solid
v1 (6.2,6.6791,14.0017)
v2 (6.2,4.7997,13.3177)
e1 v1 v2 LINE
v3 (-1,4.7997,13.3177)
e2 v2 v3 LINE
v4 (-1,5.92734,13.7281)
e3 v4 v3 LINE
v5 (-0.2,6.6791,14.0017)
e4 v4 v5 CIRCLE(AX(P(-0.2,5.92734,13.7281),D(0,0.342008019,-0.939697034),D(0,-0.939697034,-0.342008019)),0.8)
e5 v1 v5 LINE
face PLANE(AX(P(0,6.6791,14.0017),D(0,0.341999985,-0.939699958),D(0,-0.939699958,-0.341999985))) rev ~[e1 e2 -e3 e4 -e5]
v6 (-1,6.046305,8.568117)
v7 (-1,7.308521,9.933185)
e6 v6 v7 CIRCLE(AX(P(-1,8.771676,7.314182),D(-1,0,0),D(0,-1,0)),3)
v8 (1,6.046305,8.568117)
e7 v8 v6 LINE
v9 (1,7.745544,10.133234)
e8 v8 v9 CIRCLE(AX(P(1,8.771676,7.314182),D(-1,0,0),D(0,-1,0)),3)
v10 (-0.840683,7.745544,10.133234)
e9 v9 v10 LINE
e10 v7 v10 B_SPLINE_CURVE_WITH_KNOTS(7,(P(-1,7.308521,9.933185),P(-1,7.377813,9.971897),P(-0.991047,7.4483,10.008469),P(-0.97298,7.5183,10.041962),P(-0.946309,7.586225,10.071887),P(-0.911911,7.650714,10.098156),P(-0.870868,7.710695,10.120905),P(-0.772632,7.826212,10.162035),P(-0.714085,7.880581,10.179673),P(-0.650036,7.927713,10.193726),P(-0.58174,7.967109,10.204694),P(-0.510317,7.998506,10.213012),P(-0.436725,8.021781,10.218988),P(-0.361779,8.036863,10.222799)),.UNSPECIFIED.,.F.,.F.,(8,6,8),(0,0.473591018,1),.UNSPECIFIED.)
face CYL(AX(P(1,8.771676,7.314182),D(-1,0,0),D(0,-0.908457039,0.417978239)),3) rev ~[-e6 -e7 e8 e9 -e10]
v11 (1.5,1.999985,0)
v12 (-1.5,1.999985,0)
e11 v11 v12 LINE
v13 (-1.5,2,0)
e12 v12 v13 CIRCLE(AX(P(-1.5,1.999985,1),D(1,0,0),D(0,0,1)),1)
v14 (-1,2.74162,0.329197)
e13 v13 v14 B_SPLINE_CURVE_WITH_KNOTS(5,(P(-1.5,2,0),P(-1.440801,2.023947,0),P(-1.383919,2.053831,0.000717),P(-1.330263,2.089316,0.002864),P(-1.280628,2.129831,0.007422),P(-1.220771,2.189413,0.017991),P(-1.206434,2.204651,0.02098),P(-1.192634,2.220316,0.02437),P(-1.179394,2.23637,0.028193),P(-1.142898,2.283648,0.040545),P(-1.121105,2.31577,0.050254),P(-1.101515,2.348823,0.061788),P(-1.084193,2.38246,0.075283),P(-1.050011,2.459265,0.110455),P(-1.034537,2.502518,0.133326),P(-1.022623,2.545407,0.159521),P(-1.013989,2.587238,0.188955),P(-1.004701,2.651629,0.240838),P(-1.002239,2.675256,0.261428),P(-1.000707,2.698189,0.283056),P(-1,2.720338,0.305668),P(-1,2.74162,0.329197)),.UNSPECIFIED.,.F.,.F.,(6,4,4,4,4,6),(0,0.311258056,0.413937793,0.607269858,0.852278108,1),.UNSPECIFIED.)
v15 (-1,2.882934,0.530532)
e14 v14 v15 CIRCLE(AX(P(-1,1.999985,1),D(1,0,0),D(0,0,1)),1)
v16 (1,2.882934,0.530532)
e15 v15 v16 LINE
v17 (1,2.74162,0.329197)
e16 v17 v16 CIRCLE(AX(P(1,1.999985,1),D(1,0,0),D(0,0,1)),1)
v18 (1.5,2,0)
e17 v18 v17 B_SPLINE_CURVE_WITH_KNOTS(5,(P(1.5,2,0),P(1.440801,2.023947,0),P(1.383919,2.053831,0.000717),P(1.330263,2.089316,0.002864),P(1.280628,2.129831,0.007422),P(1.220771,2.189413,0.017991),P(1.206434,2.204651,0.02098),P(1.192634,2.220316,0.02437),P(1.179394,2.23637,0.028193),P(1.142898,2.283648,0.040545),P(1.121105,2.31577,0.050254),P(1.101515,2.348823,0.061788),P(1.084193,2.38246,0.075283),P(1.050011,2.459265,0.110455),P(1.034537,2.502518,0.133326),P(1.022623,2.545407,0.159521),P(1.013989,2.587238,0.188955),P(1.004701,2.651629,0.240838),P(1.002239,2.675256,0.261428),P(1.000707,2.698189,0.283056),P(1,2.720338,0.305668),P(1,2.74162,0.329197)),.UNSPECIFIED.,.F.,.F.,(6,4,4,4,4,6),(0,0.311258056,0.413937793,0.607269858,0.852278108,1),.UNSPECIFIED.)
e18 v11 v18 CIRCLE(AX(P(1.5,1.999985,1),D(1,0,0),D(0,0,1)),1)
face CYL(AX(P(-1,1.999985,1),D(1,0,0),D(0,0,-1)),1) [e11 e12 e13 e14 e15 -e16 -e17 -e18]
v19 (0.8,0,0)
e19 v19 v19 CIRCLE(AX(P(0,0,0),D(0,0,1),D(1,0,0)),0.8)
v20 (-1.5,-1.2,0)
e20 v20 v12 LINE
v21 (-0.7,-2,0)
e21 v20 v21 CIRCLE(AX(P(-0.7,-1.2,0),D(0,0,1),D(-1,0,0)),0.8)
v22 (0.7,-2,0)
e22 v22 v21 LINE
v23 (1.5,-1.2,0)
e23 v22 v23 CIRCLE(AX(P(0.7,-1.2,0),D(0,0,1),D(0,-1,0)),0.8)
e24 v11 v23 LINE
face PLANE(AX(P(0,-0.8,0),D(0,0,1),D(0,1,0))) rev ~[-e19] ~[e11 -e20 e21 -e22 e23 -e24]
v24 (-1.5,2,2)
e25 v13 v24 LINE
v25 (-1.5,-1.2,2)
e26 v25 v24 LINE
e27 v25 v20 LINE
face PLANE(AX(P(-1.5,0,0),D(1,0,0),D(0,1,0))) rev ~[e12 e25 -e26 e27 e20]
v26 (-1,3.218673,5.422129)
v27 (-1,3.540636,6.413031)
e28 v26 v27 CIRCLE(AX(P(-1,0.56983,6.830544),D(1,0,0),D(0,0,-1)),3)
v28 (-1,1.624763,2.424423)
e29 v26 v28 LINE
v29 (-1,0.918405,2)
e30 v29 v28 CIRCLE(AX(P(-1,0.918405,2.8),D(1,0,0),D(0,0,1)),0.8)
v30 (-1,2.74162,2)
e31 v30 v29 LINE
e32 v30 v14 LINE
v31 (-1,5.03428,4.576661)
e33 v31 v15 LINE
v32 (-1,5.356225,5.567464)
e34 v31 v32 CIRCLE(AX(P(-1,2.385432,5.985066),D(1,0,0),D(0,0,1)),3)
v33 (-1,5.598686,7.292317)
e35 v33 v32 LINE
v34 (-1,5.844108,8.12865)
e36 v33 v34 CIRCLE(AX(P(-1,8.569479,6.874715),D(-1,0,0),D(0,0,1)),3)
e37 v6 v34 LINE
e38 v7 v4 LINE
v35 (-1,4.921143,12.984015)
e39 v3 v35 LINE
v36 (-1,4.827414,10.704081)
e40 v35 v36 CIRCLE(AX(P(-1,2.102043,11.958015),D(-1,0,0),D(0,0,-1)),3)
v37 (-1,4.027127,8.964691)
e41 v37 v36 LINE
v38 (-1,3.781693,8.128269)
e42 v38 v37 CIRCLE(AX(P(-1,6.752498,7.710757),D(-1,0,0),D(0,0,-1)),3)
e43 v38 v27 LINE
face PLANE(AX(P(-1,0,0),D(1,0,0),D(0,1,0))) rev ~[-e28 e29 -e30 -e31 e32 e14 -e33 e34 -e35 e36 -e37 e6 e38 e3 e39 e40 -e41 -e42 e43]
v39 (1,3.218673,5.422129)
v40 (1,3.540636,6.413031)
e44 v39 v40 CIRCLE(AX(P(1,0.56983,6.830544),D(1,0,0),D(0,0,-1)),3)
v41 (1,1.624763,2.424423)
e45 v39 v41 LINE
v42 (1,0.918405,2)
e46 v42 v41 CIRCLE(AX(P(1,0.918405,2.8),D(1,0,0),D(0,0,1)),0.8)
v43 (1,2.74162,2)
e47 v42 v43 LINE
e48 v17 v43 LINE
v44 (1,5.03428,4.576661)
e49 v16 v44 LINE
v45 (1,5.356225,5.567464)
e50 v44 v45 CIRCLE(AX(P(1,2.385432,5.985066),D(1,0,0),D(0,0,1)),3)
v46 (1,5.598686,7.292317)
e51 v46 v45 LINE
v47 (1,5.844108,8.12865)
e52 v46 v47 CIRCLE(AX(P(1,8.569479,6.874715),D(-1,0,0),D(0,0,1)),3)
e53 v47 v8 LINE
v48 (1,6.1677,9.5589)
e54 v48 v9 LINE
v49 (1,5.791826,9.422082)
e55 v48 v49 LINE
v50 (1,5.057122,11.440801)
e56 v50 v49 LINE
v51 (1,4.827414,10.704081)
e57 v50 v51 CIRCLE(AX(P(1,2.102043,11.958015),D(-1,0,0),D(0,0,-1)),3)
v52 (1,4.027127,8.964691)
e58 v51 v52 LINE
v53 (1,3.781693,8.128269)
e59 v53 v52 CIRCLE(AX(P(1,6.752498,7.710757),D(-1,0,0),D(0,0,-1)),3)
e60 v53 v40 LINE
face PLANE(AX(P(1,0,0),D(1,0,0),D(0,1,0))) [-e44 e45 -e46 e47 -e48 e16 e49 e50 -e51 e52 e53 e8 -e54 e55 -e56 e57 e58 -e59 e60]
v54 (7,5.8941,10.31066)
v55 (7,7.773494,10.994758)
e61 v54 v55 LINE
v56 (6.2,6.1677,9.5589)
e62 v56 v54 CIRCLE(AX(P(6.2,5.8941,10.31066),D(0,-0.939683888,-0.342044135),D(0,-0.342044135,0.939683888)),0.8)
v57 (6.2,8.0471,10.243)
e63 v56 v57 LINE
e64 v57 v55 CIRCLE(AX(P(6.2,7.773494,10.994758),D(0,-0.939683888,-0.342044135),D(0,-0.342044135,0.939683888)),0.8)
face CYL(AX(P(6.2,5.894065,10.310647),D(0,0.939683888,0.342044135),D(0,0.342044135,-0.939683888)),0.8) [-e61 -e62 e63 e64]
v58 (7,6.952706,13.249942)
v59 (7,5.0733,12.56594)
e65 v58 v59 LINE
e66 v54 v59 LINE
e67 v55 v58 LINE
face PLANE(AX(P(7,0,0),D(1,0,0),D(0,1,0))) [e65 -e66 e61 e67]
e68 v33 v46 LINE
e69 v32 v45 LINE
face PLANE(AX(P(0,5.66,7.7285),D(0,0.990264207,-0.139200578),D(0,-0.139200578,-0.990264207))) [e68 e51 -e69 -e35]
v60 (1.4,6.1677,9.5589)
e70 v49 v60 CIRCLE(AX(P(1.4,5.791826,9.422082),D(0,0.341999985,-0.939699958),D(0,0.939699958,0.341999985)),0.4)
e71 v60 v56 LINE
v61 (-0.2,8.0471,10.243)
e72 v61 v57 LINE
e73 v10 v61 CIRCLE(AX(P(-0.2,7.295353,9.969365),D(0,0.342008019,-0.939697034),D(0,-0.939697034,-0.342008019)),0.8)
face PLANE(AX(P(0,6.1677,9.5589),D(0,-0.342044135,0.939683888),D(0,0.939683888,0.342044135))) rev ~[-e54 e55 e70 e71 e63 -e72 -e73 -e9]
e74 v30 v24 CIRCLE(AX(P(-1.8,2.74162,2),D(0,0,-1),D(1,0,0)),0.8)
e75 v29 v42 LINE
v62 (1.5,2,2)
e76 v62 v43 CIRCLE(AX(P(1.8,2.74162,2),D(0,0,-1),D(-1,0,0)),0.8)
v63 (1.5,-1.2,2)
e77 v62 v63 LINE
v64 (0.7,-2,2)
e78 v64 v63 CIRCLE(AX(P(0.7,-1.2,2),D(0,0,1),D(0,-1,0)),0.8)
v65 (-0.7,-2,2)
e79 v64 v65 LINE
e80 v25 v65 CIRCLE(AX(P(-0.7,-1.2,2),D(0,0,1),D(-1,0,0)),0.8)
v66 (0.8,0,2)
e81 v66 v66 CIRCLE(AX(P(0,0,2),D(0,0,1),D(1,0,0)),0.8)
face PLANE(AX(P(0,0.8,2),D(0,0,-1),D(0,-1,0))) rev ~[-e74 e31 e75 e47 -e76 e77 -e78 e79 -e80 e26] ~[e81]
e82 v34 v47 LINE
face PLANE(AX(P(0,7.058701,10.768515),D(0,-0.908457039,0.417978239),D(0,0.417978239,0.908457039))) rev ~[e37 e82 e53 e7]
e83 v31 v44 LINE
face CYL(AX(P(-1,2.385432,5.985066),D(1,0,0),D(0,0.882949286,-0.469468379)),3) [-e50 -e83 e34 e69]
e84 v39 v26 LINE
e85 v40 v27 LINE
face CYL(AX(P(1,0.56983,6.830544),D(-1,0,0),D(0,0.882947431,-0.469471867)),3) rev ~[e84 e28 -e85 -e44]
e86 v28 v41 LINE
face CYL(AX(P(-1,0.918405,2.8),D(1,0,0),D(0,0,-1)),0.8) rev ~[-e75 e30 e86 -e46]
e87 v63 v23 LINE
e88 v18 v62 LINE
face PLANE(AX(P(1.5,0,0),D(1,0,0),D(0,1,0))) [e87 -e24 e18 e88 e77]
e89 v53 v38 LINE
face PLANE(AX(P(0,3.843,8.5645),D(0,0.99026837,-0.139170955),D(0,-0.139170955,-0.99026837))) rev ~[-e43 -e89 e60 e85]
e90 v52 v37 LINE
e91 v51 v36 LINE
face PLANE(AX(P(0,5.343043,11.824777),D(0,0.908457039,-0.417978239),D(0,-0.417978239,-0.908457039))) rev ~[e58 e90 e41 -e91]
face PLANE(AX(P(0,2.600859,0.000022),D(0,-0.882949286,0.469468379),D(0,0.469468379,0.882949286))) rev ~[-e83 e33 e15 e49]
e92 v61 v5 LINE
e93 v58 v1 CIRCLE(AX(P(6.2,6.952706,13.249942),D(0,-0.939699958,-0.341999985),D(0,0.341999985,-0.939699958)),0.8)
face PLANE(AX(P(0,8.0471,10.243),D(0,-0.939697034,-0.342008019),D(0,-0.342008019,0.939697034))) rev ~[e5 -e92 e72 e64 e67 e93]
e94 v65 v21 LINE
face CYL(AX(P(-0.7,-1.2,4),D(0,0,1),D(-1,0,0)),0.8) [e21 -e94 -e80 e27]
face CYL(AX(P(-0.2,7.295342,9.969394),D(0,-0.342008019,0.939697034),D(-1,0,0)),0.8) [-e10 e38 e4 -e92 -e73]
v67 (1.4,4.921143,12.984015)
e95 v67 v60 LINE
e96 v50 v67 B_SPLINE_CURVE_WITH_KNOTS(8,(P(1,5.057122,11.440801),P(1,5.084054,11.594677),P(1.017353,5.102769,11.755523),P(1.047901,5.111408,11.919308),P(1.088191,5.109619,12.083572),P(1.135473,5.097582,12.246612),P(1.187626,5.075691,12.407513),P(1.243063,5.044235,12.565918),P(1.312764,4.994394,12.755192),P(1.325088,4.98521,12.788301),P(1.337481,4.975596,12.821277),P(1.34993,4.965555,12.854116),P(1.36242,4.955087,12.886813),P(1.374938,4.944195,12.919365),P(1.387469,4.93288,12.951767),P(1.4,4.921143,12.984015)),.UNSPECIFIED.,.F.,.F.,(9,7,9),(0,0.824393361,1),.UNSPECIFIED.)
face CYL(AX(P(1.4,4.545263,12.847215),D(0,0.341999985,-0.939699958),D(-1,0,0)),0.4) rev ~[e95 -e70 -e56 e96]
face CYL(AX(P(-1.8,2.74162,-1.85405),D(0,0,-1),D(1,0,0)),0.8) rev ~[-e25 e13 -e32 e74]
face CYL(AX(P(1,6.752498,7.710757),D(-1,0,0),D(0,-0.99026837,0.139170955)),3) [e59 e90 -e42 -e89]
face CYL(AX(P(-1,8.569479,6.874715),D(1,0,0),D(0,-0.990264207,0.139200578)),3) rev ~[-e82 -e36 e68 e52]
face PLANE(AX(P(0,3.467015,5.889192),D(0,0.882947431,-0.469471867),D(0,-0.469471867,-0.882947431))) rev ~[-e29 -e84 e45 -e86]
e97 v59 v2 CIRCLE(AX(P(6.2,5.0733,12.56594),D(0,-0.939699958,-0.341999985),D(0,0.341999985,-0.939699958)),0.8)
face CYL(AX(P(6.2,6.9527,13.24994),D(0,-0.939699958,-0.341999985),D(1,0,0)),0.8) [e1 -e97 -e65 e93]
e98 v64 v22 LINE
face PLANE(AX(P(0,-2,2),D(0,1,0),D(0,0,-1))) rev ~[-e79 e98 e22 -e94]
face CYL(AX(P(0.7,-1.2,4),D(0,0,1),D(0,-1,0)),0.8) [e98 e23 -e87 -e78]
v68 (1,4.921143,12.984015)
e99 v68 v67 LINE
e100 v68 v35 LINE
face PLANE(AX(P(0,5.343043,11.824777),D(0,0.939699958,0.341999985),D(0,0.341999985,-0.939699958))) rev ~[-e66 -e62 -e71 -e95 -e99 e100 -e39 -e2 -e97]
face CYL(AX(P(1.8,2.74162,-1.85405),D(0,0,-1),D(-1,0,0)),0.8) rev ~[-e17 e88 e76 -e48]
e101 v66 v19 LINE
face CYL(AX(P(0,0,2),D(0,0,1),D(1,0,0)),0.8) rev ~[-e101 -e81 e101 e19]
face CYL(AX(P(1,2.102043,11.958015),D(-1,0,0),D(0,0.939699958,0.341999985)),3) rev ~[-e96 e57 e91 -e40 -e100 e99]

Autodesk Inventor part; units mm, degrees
ref_plane "YZ Plane" through (0, 0, 0) normal (1, 0, 0) x (0, 1, 0)
ref_plane "XZ Plane" through (0, 0, 0) normal (0, 1, 0) x (-1, 0, 0)
ref_plane "XY Plane" through (0, 0, 0) normal (0, 0, 1) x (1, 0, 0)
sketch "スケッチ5" plane through (0, 0, 0) normal (1, 0, 0) x (0, 1, 0)
  line L0 (0, 0) -> (0, 1.2936) construction
  line L1 (0, 0) -> (-1.3338, 0) construction
  line L2 (2, 2) -> (-2, 2)
  line L3 (-2, 2) -> (-2, 0)
  line L4 (-2, 0) -> (2, 0)
  line L5 (2, 0) -> (2, 2)
  line L6 (0.8, 2) -> (0.8, 0)
  line L7 (-0.8, 2) -> (-0.8, 0)
  line L8 (-2, 1) -> (2, 1) construction
  line L9 (2, 1) -> (7.1642, 10.7124) construction
  line L10 (8.0471, 10.243) -> (6.2812, 11.1819)
  line L11 (6.2812, 11.1819) -> (0.7025, 0.6899)
  line L12 (0.7025, 0.6899) -> (2.4684, -0.2491)
  line L13 (2.4684, -0.2491) -> (8.0471, 10.243)
  line L14 (2, 0) -> (2.6009, 0)
  line L15 (6.6791, 14.0017) -> (4.7997, 13.3177)
  line L16 (4.7997, 13.3177) -> (6.1677, 9.5589)
  line L17 (6.1677, 9.5589) -> (8.0471, 10.243)
  line L18 (8.0471, 10.243) -> (6.6791, 14.0017)
  line L19 (6.6791, 14.0017) -> (6.1677, 9.5589) construction
  line L20 (4.7997, 13.3177) -> (8.0471, 10.243) construction
  line L21 (5.7394, 13.6597) -> (7.1074, 9.9009) construction
  line L22 (6.4234, 11.7803) -> (4.7515, 8.1465) construction
  line L23 (4.7515, 8.1465) -> (4.3748, 5.4664) construction
  line L24 (6.2812, 11.1819) -> (2.4684, -0.2491) construction
  line L25 (0.7025, 0.6899) -> (8.0471, 10.243) construction
  line L26 (7.3319, 11.3623) -> (5.5149, 12.1983)
  line L27 (5.5149, 12.1983) -> (3.843, 8.5645)
  line L28 (3.843, 8.5645) -> (5.66, 7.7285)
  line L29 (5.66, 7.7285) -> (7.3319, 11.3623)
  line L30 (7.3319, 11.3623) -> (3.843, 8.5645) construction
  line L31 (5.5149, 12.1983) -> (5.66, 7.7285) construction
  line L32 (5.66, 7.7285) -> (5.2826, 5.0437)
  line L33 (3.843, 8.5645) -> (2.6532, 0.0985)
  line L34 (3.467, 5.8892) -> (5.2329, 4.9502)
  point P0 (1.3991, 2)
  point P1 (5.5874, 9.9634)
  point P2 (5.3431, 11.8247)
  point P3 (6.5694, 9.7051)
  dimension "d25" = 1.6
  dimension "d26" = 4
  dimension "d27" = 2
  dimension "d28" = 118
  dimension "d29" = 2
  dimension "d30" = 11
  dimension "d44" = 2
  dimension "d45" = 20
  dimension "d46" = 4
  dimension "d52" = 20
  dimension "d53" = 4
  dimension "d54" = 2
extrude "押し出し8" add sketch "スケッチ5" along normal mid plane 3 contours L6 L11 L12 L4 L7 L2 | L2 L11 L6 | L7 L4 L3 L2 | L2 L5 L12 L6 L11 | L6 L12 L11 | L12 L4 L6
ref_plane "作業平面7" through (-1.5, -2, 2) normal (0, 0, 1) x (1, 0, 0)
sketch "スケッチ6" plane through (-1.5, -2, 2) normal (0, 0, 1) x (1, 0, 0)
  line L0 (3, 0) -> (0, 0) projected
  line L1 (3, 4) -> (3, 0) projected
  line L2 (0, 4) -> (3, 4) projected
  line L3 (0, 0) -> (0, 4) projected
  line L4 (0, 4) -> (3, 4) projected
  line L5 (0, 4) -> (3, 0) construction
  line L6 (0, 0) -> (3, 0) projected
  line L7 (3, 0) -> (3, 4) projected
  line L8 (0, 0) -> (3, 4) construction
  circle A0 centre (1.5, 2) radius 0.8
  dimension "d35" = 1.6
extrude "押し出し9" cut sketch "スケッチ6" against normal blind 4 contours A0
extrude "押し出し13" add sketch "スケッチ5" along normal blind 7 contours L16 L27 L26 L29 L10 L11 | L11 L10 L29 L17 L16 | L16 L15 L18 L10 L29 L26 L27 | L29 L10 L17
extrude "押し出し15" add sketch "スケッチ5" along normal mid plane 2 contours L11 L33 L13 L14 L5 L2 | L33 L28 L11 | L34 L13 L33 | L11 L28 L32 L13 L34 | L28 L27 L16 L11 | L11 L16 L17 L29 L28 | L16 L27 L26 L29 L10 L11 | L11 L10 L29 L17 L16
extrude "押し出し16" add sketch "スケッチ5" against normal blind 1 contours L16 L15 L18 L10 L29 L26 L27 | L29 L10 L17
fillet "フィレット1" radius 0.8 1 edges at (0, 1.3991, 2)
fillet "フィレット2" radius 1 1 edges at (0, 2.6009, 0)
fillet "フィレット3" radius 3 4 edges at (0, 5.2826, 5.0437) (0, 3.467, 5.8892) (0, 3.843, 8.5645) (0, 5.66, 7.7285)
fillet "フィレット4" radius 3 2 edges at (0, 5.3431, 11.8247) (0, 6.5694, 9.7051)
fillet "フィレット6" radius 0.8 1 edges at (-1, 7.3631, 12.1223)
ref_plane "作業平面8" through (-0.2, 5.7394, 13.6597) normal (0, 0.9396926, 0.3420201) x (1, 0, 0)
sketch "スケッチ8" plane through (-0.2, 5.7394, 13.6597) normal (0, 0.9396926, 0.3420201) x (1, 0, 0)
  point P0 (0.2, 10.8729)
fillet "フィレット11" radius 0.8 2 edges at (7, 5.7394, 13.6597) (7, 7.1074, 9.9009)
fillet "フィレット12" radius 0.8 4 edges at (1, 2, 1) (-1, 2, 1) (-1.5, -2, 1) (1.5, -2, 1)
fillet "フィレット13" radius 0.4 1 edges at (1, 5.5444, 11.2714)
properties part number "battery-stopper-1"
